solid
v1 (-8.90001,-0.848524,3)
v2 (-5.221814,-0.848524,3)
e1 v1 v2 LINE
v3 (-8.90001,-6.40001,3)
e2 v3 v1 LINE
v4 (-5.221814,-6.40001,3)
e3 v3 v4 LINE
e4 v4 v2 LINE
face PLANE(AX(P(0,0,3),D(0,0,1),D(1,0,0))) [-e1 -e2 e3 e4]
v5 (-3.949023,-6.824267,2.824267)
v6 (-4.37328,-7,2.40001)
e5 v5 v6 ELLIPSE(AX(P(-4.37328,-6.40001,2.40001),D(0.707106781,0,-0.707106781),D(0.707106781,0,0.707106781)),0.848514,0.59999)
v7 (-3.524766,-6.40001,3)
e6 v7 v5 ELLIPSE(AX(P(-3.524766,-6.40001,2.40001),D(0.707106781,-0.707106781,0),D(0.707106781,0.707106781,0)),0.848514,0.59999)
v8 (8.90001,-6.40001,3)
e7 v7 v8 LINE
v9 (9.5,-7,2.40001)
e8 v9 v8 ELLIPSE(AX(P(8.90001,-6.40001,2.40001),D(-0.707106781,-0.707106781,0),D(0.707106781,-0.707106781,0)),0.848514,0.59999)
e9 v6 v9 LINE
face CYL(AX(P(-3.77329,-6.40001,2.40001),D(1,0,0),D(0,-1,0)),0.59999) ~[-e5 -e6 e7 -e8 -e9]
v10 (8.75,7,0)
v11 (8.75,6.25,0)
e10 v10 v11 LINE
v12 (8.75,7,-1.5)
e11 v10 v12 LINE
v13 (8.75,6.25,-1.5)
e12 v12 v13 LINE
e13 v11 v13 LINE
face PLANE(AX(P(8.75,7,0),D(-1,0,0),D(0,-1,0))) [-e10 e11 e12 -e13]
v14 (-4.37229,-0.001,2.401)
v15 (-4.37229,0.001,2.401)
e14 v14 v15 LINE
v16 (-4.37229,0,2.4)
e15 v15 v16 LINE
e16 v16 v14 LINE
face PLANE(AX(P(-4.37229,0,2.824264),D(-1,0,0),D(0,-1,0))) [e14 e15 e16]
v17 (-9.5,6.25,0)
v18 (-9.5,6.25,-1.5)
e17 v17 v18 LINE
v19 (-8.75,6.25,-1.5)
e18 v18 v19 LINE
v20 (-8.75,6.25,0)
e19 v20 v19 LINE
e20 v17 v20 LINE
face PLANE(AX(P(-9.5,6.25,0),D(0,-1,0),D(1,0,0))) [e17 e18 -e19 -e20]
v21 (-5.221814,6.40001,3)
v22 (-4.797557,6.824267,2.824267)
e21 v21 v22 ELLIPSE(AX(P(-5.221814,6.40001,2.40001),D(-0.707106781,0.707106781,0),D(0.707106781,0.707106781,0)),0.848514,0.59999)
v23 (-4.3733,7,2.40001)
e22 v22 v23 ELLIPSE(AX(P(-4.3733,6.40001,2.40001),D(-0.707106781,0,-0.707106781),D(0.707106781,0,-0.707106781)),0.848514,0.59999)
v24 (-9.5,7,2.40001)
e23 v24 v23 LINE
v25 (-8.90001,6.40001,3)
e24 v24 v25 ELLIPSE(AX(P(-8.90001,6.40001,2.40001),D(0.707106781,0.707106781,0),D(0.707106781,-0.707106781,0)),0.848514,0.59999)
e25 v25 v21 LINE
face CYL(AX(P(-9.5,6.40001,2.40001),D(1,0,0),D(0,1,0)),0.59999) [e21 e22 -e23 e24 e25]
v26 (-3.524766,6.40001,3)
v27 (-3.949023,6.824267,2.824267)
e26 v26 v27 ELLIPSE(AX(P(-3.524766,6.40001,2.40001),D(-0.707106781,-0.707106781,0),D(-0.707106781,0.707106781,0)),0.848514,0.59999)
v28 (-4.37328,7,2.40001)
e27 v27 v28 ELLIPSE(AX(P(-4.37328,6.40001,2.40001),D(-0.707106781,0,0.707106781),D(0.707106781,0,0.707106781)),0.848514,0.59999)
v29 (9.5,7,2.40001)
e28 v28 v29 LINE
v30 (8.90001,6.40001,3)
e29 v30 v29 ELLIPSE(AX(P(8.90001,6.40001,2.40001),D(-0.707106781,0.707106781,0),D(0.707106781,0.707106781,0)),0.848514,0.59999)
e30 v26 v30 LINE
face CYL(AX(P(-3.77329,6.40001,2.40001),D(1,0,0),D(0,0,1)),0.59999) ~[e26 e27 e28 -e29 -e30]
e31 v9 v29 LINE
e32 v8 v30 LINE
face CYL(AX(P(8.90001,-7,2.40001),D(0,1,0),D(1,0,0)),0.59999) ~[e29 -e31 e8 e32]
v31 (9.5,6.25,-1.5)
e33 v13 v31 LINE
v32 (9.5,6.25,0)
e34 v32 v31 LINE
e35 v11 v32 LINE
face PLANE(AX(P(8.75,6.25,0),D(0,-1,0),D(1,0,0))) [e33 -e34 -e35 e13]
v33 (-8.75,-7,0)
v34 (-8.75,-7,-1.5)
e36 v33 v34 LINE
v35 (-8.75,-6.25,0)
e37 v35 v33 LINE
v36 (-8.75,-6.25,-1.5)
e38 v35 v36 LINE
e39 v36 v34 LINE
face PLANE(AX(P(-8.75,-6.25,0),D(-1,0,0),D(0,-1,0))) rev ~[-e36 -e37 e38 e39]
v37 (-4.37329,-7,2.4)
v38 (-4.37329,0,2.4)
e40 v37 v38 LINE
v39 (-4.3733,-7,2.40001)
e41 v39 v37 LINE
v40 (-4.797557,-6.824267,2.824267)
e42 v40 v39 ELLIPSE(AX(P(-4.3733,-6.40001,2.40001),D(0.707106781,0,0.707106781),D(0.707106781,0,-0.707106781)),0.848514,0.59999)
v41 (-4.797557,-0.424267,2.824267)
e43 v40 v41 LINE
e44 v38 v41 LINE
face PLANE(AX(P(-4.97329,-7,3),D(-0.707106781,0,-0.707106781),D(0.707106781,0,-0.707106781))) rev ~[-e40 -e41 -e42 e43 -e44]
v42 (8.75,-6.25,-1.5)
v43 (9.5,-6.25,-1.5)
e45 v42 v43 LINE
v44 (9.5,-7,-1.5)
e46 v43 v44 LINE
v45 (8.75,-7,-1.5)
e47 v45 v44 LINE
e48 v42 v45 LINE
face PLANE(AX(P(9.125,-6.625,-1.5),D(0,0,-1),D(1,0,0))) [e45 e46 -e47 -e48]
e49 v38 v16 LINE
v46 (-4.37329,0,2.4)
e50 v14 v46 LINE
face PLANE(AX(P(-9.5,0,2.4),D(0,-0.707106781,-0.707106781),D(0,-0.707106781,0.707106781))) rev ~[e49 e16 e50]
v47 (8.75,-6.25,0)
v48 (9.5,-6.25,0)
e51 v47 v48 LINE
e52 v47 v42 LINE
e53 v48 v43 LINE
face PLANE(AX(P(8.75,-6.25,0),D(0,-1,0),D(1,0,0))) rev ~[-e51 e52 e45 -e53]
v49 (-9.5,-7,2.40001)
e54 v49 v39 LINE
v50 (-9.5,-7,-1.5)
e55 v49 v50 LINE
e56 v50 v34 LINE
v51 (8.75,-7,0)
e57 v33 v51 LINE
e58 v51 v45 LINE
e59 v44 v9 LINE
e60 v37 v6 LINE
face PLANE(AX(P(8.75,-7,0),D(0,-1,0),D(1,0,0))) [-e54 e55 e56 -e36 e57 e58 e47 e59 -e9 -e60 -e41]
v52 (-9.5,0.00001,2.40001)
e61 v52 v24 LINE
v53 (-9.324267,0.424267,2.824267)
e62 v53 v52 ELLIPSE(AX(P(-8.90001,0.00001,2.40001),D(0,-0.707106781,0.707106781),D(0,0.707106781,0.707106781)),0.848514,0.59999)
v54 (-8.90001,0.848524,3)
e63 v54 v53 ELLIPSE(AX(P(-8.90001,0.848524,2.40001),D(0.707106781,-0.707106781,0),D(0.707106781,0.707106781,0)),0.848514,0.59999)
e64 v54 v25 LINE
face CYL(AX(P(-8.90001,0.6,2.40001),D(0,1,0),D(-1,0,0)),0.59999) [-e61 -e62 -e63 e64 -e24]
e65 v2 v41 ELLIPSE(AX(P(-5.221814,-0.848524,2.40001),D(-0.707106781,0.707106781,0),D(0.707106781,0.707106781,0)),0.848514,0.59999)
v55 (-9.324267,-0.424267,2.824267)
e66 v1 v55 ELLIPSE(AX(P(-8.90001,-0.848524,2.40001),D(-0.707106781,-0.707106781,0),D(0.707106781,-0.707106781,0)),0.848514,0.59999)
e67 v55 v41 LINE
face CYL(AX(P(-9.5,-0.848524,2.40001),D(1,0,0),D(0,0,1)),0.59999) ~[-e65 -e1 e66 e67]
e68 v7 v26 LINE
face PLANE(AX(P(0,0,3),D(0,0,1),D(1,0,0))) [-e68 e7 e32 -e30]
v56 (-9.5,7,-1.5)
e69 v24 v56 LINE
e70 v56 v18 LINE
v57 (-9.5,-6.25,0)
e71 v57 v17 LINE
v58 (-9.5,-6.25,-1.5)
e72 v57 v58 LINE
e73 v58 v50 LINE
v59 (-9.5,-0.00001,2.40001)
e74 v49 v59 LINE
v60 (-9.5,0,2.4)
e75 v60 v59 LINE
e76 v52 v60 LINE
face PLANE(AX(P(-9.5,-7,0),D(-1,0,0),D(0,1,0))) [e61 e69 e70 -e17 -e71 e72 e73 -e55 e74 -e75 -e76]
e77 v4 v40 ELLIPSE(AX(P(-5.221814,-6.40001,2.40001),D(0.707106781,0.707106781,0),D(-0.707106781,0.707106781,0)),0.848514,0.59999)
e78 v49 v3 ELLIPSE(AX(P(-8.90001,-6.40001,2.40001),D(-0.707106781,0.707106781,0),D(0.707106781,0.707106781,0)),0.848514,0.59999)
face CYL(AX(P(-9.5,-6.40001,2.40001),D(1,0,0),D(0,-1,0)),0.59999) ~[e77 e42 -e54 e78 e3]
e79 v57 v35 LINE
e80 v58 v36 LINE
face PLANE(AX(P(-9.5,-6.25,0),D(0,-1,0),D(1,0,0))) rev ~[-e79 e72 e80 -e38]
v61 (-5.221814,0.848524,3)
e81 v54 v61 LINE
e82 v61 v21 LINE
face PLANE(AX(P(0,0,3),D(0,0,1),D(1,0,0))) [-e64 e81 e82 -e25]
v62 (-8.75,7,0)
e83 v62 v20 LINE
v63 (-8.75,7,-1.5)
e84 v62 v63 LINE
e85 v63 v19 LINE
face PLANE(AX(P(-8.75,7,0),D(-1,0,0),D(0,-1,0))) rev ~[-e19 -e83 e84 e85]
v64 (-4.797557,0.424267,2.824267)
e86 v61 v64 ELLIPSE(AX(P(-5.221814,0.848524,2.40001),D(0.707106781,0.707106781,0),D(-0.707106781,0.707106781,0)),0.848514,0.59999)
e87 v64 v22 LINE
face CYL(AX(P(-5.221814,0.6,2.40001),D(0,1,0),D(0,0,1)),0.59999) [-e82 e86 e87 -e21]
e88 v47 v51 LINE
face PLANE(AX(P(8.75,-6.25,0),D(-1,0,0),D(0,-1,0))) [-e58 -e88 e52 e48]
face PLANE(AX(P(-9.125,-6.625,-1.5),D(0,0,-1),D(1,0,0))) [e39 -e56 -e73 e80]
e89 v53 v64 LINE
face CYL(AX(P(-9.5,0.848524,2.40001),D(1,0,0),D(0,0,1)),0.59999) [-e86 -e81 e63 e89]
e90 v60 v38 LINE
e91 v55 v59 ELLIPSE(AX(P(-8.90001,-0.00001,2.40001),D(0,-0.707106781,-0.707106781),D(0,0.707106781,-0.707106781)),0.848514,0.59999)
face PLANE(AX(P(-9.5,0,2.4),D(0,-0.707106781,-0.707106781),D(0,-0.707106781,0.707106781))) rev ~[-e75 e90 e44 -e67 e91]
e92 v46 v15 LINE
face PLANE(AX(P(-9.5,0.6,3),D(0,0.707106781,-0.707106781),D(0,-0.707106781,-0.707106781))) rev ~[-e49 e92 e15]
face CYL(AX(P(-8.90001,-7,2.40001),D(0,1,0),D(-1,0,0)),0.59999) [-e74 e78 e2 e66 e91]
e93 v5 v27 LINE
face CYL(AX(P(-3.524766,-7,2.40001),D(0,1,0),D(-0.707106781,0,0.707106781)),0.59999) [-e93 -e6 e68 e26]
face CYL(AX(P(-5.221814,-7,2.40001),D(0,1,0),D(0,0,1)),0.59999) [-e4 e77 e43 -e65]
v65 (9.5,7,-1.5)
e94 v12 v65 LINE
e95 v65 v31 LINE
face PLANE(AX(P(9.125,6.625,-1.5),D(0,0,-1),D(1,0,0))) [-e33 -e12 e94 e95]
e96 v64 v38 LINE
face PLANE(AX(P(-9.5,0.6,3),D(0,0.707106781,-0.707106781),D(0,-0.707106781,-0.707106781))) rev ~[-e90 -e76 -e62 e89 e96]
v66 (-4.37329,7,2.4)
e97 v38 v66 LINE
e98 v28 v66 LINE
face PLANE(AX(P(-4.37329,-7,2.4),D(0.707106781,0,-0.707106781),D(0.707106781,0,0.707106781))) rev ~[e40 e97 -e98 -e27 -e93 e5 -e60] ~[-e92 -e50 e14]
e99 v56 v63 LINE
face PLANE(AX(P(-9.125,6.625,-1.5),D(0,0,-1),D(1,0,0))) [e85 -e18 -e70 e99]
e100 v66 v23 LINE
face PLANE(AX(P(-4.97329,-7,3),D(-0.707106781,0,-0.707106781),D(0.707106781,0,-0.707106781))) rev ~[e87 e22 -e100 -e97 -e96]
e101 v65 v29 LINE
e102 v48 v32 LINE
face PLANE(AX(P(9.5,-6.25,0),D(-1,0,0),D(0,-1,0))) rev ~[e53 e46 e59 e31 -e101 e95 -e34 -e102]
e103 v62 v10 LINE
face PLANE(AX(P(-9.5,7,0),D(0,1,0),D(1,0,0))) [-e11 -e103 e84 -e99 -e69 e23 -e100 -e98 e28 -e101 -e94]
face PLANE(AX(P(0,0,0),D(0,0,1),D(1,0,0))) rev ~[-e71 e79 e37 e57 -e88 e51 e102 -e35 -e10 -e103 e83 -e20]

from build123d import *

# Parameters (mm, degrees)
F0_W     = 19
F0_H     = 14
F1_DEPTH = 3
F2_W     = 0.75
F2_H     = 0.75
F3_DEPTH = 1.5
F5_DEPTH = 14.001
F7_DEPTH = 5.127709538
F8_R     = 0.59999


# Not quite as in the source:
# - a fillet or chamfer is up to 0.001 mm smaller than in the source, because OpenCascade refuses the exact size


with BuildPart() as f1:
    # F0 (on Top) → F1 (new body)
    with BuildSketch(Plane.XY):
        Rectangle(F0_W, F0_H)
    extrude(amount=F1_DEPTH)

    # F2 (on face) → F3 (join)
    with BuildSketch(Plane(origin=(0, 0, 0), x_dir=(1, 0, 0), z_dir=(0, 0, -1))):
        with Locations((9.125, 6.625)):
            Rectangle(F2_W, F2_H)
        with Locations((-9.125, 6.625)):
            Rectangle(F2_W, F2_H)
        with Locations((-9.125, -6.625)):
            Rectangle(F2_W, F2_H)
        with Locations((9.125, -6.625)):
            Rectangle(F2_W, F2_H)
    extrude(amount=F3_DEPTH)

    # F4 (on face) → F5 (cut, through all)
    with BuildSketch(Plane.XZ.offset(7)):
        Polygon((-3.773290462, 3), (-4.973290462, 3), (-4.373290462, 2.4), align=None)
    extrude(amount=-F5_DEPTH, mode=Mode.SUBTRACT)

    # F6 (on face) → F7 (cut, through all)
    with BuildSketch(Plane(origin=(-9.5, 0, 0), x_dir=(0, -1, 0), z_dir=(-1, 0, 0))):
        Polygon((0.6, 3), (-0.6, 3), (0, 2.4), align=None)
    extrude(amount=-F7_DEPTH, mode=Mode.SUBTRACT)

    # F8 (radius 0.6 in the source; OpenCascade refuses exactly that, so slightly less here)
    f8_edges = [f1.edges().sort_by_distance(p)[0] for p in [
        (-3.77329, 0, 3),
        (-4.97329, 3.8, 3),
        (-4.97329, -3.8, 3),
        (-7.236645, -0.6, 3),
        (-7.236645, 0.6, 3),
        (2.863355, -7, 3),
        (-7.236645, -7, 3),
        (2.863355, 7, 3),
        (9.5, 0, 3),
        (-7.236645, 7, 3),
        (-9.5, 3.8, 3),
        (-9.5, -3.8, 3),
    ]]
    fillet(f8_edges, radius=F8_R)


solid = f1.part
